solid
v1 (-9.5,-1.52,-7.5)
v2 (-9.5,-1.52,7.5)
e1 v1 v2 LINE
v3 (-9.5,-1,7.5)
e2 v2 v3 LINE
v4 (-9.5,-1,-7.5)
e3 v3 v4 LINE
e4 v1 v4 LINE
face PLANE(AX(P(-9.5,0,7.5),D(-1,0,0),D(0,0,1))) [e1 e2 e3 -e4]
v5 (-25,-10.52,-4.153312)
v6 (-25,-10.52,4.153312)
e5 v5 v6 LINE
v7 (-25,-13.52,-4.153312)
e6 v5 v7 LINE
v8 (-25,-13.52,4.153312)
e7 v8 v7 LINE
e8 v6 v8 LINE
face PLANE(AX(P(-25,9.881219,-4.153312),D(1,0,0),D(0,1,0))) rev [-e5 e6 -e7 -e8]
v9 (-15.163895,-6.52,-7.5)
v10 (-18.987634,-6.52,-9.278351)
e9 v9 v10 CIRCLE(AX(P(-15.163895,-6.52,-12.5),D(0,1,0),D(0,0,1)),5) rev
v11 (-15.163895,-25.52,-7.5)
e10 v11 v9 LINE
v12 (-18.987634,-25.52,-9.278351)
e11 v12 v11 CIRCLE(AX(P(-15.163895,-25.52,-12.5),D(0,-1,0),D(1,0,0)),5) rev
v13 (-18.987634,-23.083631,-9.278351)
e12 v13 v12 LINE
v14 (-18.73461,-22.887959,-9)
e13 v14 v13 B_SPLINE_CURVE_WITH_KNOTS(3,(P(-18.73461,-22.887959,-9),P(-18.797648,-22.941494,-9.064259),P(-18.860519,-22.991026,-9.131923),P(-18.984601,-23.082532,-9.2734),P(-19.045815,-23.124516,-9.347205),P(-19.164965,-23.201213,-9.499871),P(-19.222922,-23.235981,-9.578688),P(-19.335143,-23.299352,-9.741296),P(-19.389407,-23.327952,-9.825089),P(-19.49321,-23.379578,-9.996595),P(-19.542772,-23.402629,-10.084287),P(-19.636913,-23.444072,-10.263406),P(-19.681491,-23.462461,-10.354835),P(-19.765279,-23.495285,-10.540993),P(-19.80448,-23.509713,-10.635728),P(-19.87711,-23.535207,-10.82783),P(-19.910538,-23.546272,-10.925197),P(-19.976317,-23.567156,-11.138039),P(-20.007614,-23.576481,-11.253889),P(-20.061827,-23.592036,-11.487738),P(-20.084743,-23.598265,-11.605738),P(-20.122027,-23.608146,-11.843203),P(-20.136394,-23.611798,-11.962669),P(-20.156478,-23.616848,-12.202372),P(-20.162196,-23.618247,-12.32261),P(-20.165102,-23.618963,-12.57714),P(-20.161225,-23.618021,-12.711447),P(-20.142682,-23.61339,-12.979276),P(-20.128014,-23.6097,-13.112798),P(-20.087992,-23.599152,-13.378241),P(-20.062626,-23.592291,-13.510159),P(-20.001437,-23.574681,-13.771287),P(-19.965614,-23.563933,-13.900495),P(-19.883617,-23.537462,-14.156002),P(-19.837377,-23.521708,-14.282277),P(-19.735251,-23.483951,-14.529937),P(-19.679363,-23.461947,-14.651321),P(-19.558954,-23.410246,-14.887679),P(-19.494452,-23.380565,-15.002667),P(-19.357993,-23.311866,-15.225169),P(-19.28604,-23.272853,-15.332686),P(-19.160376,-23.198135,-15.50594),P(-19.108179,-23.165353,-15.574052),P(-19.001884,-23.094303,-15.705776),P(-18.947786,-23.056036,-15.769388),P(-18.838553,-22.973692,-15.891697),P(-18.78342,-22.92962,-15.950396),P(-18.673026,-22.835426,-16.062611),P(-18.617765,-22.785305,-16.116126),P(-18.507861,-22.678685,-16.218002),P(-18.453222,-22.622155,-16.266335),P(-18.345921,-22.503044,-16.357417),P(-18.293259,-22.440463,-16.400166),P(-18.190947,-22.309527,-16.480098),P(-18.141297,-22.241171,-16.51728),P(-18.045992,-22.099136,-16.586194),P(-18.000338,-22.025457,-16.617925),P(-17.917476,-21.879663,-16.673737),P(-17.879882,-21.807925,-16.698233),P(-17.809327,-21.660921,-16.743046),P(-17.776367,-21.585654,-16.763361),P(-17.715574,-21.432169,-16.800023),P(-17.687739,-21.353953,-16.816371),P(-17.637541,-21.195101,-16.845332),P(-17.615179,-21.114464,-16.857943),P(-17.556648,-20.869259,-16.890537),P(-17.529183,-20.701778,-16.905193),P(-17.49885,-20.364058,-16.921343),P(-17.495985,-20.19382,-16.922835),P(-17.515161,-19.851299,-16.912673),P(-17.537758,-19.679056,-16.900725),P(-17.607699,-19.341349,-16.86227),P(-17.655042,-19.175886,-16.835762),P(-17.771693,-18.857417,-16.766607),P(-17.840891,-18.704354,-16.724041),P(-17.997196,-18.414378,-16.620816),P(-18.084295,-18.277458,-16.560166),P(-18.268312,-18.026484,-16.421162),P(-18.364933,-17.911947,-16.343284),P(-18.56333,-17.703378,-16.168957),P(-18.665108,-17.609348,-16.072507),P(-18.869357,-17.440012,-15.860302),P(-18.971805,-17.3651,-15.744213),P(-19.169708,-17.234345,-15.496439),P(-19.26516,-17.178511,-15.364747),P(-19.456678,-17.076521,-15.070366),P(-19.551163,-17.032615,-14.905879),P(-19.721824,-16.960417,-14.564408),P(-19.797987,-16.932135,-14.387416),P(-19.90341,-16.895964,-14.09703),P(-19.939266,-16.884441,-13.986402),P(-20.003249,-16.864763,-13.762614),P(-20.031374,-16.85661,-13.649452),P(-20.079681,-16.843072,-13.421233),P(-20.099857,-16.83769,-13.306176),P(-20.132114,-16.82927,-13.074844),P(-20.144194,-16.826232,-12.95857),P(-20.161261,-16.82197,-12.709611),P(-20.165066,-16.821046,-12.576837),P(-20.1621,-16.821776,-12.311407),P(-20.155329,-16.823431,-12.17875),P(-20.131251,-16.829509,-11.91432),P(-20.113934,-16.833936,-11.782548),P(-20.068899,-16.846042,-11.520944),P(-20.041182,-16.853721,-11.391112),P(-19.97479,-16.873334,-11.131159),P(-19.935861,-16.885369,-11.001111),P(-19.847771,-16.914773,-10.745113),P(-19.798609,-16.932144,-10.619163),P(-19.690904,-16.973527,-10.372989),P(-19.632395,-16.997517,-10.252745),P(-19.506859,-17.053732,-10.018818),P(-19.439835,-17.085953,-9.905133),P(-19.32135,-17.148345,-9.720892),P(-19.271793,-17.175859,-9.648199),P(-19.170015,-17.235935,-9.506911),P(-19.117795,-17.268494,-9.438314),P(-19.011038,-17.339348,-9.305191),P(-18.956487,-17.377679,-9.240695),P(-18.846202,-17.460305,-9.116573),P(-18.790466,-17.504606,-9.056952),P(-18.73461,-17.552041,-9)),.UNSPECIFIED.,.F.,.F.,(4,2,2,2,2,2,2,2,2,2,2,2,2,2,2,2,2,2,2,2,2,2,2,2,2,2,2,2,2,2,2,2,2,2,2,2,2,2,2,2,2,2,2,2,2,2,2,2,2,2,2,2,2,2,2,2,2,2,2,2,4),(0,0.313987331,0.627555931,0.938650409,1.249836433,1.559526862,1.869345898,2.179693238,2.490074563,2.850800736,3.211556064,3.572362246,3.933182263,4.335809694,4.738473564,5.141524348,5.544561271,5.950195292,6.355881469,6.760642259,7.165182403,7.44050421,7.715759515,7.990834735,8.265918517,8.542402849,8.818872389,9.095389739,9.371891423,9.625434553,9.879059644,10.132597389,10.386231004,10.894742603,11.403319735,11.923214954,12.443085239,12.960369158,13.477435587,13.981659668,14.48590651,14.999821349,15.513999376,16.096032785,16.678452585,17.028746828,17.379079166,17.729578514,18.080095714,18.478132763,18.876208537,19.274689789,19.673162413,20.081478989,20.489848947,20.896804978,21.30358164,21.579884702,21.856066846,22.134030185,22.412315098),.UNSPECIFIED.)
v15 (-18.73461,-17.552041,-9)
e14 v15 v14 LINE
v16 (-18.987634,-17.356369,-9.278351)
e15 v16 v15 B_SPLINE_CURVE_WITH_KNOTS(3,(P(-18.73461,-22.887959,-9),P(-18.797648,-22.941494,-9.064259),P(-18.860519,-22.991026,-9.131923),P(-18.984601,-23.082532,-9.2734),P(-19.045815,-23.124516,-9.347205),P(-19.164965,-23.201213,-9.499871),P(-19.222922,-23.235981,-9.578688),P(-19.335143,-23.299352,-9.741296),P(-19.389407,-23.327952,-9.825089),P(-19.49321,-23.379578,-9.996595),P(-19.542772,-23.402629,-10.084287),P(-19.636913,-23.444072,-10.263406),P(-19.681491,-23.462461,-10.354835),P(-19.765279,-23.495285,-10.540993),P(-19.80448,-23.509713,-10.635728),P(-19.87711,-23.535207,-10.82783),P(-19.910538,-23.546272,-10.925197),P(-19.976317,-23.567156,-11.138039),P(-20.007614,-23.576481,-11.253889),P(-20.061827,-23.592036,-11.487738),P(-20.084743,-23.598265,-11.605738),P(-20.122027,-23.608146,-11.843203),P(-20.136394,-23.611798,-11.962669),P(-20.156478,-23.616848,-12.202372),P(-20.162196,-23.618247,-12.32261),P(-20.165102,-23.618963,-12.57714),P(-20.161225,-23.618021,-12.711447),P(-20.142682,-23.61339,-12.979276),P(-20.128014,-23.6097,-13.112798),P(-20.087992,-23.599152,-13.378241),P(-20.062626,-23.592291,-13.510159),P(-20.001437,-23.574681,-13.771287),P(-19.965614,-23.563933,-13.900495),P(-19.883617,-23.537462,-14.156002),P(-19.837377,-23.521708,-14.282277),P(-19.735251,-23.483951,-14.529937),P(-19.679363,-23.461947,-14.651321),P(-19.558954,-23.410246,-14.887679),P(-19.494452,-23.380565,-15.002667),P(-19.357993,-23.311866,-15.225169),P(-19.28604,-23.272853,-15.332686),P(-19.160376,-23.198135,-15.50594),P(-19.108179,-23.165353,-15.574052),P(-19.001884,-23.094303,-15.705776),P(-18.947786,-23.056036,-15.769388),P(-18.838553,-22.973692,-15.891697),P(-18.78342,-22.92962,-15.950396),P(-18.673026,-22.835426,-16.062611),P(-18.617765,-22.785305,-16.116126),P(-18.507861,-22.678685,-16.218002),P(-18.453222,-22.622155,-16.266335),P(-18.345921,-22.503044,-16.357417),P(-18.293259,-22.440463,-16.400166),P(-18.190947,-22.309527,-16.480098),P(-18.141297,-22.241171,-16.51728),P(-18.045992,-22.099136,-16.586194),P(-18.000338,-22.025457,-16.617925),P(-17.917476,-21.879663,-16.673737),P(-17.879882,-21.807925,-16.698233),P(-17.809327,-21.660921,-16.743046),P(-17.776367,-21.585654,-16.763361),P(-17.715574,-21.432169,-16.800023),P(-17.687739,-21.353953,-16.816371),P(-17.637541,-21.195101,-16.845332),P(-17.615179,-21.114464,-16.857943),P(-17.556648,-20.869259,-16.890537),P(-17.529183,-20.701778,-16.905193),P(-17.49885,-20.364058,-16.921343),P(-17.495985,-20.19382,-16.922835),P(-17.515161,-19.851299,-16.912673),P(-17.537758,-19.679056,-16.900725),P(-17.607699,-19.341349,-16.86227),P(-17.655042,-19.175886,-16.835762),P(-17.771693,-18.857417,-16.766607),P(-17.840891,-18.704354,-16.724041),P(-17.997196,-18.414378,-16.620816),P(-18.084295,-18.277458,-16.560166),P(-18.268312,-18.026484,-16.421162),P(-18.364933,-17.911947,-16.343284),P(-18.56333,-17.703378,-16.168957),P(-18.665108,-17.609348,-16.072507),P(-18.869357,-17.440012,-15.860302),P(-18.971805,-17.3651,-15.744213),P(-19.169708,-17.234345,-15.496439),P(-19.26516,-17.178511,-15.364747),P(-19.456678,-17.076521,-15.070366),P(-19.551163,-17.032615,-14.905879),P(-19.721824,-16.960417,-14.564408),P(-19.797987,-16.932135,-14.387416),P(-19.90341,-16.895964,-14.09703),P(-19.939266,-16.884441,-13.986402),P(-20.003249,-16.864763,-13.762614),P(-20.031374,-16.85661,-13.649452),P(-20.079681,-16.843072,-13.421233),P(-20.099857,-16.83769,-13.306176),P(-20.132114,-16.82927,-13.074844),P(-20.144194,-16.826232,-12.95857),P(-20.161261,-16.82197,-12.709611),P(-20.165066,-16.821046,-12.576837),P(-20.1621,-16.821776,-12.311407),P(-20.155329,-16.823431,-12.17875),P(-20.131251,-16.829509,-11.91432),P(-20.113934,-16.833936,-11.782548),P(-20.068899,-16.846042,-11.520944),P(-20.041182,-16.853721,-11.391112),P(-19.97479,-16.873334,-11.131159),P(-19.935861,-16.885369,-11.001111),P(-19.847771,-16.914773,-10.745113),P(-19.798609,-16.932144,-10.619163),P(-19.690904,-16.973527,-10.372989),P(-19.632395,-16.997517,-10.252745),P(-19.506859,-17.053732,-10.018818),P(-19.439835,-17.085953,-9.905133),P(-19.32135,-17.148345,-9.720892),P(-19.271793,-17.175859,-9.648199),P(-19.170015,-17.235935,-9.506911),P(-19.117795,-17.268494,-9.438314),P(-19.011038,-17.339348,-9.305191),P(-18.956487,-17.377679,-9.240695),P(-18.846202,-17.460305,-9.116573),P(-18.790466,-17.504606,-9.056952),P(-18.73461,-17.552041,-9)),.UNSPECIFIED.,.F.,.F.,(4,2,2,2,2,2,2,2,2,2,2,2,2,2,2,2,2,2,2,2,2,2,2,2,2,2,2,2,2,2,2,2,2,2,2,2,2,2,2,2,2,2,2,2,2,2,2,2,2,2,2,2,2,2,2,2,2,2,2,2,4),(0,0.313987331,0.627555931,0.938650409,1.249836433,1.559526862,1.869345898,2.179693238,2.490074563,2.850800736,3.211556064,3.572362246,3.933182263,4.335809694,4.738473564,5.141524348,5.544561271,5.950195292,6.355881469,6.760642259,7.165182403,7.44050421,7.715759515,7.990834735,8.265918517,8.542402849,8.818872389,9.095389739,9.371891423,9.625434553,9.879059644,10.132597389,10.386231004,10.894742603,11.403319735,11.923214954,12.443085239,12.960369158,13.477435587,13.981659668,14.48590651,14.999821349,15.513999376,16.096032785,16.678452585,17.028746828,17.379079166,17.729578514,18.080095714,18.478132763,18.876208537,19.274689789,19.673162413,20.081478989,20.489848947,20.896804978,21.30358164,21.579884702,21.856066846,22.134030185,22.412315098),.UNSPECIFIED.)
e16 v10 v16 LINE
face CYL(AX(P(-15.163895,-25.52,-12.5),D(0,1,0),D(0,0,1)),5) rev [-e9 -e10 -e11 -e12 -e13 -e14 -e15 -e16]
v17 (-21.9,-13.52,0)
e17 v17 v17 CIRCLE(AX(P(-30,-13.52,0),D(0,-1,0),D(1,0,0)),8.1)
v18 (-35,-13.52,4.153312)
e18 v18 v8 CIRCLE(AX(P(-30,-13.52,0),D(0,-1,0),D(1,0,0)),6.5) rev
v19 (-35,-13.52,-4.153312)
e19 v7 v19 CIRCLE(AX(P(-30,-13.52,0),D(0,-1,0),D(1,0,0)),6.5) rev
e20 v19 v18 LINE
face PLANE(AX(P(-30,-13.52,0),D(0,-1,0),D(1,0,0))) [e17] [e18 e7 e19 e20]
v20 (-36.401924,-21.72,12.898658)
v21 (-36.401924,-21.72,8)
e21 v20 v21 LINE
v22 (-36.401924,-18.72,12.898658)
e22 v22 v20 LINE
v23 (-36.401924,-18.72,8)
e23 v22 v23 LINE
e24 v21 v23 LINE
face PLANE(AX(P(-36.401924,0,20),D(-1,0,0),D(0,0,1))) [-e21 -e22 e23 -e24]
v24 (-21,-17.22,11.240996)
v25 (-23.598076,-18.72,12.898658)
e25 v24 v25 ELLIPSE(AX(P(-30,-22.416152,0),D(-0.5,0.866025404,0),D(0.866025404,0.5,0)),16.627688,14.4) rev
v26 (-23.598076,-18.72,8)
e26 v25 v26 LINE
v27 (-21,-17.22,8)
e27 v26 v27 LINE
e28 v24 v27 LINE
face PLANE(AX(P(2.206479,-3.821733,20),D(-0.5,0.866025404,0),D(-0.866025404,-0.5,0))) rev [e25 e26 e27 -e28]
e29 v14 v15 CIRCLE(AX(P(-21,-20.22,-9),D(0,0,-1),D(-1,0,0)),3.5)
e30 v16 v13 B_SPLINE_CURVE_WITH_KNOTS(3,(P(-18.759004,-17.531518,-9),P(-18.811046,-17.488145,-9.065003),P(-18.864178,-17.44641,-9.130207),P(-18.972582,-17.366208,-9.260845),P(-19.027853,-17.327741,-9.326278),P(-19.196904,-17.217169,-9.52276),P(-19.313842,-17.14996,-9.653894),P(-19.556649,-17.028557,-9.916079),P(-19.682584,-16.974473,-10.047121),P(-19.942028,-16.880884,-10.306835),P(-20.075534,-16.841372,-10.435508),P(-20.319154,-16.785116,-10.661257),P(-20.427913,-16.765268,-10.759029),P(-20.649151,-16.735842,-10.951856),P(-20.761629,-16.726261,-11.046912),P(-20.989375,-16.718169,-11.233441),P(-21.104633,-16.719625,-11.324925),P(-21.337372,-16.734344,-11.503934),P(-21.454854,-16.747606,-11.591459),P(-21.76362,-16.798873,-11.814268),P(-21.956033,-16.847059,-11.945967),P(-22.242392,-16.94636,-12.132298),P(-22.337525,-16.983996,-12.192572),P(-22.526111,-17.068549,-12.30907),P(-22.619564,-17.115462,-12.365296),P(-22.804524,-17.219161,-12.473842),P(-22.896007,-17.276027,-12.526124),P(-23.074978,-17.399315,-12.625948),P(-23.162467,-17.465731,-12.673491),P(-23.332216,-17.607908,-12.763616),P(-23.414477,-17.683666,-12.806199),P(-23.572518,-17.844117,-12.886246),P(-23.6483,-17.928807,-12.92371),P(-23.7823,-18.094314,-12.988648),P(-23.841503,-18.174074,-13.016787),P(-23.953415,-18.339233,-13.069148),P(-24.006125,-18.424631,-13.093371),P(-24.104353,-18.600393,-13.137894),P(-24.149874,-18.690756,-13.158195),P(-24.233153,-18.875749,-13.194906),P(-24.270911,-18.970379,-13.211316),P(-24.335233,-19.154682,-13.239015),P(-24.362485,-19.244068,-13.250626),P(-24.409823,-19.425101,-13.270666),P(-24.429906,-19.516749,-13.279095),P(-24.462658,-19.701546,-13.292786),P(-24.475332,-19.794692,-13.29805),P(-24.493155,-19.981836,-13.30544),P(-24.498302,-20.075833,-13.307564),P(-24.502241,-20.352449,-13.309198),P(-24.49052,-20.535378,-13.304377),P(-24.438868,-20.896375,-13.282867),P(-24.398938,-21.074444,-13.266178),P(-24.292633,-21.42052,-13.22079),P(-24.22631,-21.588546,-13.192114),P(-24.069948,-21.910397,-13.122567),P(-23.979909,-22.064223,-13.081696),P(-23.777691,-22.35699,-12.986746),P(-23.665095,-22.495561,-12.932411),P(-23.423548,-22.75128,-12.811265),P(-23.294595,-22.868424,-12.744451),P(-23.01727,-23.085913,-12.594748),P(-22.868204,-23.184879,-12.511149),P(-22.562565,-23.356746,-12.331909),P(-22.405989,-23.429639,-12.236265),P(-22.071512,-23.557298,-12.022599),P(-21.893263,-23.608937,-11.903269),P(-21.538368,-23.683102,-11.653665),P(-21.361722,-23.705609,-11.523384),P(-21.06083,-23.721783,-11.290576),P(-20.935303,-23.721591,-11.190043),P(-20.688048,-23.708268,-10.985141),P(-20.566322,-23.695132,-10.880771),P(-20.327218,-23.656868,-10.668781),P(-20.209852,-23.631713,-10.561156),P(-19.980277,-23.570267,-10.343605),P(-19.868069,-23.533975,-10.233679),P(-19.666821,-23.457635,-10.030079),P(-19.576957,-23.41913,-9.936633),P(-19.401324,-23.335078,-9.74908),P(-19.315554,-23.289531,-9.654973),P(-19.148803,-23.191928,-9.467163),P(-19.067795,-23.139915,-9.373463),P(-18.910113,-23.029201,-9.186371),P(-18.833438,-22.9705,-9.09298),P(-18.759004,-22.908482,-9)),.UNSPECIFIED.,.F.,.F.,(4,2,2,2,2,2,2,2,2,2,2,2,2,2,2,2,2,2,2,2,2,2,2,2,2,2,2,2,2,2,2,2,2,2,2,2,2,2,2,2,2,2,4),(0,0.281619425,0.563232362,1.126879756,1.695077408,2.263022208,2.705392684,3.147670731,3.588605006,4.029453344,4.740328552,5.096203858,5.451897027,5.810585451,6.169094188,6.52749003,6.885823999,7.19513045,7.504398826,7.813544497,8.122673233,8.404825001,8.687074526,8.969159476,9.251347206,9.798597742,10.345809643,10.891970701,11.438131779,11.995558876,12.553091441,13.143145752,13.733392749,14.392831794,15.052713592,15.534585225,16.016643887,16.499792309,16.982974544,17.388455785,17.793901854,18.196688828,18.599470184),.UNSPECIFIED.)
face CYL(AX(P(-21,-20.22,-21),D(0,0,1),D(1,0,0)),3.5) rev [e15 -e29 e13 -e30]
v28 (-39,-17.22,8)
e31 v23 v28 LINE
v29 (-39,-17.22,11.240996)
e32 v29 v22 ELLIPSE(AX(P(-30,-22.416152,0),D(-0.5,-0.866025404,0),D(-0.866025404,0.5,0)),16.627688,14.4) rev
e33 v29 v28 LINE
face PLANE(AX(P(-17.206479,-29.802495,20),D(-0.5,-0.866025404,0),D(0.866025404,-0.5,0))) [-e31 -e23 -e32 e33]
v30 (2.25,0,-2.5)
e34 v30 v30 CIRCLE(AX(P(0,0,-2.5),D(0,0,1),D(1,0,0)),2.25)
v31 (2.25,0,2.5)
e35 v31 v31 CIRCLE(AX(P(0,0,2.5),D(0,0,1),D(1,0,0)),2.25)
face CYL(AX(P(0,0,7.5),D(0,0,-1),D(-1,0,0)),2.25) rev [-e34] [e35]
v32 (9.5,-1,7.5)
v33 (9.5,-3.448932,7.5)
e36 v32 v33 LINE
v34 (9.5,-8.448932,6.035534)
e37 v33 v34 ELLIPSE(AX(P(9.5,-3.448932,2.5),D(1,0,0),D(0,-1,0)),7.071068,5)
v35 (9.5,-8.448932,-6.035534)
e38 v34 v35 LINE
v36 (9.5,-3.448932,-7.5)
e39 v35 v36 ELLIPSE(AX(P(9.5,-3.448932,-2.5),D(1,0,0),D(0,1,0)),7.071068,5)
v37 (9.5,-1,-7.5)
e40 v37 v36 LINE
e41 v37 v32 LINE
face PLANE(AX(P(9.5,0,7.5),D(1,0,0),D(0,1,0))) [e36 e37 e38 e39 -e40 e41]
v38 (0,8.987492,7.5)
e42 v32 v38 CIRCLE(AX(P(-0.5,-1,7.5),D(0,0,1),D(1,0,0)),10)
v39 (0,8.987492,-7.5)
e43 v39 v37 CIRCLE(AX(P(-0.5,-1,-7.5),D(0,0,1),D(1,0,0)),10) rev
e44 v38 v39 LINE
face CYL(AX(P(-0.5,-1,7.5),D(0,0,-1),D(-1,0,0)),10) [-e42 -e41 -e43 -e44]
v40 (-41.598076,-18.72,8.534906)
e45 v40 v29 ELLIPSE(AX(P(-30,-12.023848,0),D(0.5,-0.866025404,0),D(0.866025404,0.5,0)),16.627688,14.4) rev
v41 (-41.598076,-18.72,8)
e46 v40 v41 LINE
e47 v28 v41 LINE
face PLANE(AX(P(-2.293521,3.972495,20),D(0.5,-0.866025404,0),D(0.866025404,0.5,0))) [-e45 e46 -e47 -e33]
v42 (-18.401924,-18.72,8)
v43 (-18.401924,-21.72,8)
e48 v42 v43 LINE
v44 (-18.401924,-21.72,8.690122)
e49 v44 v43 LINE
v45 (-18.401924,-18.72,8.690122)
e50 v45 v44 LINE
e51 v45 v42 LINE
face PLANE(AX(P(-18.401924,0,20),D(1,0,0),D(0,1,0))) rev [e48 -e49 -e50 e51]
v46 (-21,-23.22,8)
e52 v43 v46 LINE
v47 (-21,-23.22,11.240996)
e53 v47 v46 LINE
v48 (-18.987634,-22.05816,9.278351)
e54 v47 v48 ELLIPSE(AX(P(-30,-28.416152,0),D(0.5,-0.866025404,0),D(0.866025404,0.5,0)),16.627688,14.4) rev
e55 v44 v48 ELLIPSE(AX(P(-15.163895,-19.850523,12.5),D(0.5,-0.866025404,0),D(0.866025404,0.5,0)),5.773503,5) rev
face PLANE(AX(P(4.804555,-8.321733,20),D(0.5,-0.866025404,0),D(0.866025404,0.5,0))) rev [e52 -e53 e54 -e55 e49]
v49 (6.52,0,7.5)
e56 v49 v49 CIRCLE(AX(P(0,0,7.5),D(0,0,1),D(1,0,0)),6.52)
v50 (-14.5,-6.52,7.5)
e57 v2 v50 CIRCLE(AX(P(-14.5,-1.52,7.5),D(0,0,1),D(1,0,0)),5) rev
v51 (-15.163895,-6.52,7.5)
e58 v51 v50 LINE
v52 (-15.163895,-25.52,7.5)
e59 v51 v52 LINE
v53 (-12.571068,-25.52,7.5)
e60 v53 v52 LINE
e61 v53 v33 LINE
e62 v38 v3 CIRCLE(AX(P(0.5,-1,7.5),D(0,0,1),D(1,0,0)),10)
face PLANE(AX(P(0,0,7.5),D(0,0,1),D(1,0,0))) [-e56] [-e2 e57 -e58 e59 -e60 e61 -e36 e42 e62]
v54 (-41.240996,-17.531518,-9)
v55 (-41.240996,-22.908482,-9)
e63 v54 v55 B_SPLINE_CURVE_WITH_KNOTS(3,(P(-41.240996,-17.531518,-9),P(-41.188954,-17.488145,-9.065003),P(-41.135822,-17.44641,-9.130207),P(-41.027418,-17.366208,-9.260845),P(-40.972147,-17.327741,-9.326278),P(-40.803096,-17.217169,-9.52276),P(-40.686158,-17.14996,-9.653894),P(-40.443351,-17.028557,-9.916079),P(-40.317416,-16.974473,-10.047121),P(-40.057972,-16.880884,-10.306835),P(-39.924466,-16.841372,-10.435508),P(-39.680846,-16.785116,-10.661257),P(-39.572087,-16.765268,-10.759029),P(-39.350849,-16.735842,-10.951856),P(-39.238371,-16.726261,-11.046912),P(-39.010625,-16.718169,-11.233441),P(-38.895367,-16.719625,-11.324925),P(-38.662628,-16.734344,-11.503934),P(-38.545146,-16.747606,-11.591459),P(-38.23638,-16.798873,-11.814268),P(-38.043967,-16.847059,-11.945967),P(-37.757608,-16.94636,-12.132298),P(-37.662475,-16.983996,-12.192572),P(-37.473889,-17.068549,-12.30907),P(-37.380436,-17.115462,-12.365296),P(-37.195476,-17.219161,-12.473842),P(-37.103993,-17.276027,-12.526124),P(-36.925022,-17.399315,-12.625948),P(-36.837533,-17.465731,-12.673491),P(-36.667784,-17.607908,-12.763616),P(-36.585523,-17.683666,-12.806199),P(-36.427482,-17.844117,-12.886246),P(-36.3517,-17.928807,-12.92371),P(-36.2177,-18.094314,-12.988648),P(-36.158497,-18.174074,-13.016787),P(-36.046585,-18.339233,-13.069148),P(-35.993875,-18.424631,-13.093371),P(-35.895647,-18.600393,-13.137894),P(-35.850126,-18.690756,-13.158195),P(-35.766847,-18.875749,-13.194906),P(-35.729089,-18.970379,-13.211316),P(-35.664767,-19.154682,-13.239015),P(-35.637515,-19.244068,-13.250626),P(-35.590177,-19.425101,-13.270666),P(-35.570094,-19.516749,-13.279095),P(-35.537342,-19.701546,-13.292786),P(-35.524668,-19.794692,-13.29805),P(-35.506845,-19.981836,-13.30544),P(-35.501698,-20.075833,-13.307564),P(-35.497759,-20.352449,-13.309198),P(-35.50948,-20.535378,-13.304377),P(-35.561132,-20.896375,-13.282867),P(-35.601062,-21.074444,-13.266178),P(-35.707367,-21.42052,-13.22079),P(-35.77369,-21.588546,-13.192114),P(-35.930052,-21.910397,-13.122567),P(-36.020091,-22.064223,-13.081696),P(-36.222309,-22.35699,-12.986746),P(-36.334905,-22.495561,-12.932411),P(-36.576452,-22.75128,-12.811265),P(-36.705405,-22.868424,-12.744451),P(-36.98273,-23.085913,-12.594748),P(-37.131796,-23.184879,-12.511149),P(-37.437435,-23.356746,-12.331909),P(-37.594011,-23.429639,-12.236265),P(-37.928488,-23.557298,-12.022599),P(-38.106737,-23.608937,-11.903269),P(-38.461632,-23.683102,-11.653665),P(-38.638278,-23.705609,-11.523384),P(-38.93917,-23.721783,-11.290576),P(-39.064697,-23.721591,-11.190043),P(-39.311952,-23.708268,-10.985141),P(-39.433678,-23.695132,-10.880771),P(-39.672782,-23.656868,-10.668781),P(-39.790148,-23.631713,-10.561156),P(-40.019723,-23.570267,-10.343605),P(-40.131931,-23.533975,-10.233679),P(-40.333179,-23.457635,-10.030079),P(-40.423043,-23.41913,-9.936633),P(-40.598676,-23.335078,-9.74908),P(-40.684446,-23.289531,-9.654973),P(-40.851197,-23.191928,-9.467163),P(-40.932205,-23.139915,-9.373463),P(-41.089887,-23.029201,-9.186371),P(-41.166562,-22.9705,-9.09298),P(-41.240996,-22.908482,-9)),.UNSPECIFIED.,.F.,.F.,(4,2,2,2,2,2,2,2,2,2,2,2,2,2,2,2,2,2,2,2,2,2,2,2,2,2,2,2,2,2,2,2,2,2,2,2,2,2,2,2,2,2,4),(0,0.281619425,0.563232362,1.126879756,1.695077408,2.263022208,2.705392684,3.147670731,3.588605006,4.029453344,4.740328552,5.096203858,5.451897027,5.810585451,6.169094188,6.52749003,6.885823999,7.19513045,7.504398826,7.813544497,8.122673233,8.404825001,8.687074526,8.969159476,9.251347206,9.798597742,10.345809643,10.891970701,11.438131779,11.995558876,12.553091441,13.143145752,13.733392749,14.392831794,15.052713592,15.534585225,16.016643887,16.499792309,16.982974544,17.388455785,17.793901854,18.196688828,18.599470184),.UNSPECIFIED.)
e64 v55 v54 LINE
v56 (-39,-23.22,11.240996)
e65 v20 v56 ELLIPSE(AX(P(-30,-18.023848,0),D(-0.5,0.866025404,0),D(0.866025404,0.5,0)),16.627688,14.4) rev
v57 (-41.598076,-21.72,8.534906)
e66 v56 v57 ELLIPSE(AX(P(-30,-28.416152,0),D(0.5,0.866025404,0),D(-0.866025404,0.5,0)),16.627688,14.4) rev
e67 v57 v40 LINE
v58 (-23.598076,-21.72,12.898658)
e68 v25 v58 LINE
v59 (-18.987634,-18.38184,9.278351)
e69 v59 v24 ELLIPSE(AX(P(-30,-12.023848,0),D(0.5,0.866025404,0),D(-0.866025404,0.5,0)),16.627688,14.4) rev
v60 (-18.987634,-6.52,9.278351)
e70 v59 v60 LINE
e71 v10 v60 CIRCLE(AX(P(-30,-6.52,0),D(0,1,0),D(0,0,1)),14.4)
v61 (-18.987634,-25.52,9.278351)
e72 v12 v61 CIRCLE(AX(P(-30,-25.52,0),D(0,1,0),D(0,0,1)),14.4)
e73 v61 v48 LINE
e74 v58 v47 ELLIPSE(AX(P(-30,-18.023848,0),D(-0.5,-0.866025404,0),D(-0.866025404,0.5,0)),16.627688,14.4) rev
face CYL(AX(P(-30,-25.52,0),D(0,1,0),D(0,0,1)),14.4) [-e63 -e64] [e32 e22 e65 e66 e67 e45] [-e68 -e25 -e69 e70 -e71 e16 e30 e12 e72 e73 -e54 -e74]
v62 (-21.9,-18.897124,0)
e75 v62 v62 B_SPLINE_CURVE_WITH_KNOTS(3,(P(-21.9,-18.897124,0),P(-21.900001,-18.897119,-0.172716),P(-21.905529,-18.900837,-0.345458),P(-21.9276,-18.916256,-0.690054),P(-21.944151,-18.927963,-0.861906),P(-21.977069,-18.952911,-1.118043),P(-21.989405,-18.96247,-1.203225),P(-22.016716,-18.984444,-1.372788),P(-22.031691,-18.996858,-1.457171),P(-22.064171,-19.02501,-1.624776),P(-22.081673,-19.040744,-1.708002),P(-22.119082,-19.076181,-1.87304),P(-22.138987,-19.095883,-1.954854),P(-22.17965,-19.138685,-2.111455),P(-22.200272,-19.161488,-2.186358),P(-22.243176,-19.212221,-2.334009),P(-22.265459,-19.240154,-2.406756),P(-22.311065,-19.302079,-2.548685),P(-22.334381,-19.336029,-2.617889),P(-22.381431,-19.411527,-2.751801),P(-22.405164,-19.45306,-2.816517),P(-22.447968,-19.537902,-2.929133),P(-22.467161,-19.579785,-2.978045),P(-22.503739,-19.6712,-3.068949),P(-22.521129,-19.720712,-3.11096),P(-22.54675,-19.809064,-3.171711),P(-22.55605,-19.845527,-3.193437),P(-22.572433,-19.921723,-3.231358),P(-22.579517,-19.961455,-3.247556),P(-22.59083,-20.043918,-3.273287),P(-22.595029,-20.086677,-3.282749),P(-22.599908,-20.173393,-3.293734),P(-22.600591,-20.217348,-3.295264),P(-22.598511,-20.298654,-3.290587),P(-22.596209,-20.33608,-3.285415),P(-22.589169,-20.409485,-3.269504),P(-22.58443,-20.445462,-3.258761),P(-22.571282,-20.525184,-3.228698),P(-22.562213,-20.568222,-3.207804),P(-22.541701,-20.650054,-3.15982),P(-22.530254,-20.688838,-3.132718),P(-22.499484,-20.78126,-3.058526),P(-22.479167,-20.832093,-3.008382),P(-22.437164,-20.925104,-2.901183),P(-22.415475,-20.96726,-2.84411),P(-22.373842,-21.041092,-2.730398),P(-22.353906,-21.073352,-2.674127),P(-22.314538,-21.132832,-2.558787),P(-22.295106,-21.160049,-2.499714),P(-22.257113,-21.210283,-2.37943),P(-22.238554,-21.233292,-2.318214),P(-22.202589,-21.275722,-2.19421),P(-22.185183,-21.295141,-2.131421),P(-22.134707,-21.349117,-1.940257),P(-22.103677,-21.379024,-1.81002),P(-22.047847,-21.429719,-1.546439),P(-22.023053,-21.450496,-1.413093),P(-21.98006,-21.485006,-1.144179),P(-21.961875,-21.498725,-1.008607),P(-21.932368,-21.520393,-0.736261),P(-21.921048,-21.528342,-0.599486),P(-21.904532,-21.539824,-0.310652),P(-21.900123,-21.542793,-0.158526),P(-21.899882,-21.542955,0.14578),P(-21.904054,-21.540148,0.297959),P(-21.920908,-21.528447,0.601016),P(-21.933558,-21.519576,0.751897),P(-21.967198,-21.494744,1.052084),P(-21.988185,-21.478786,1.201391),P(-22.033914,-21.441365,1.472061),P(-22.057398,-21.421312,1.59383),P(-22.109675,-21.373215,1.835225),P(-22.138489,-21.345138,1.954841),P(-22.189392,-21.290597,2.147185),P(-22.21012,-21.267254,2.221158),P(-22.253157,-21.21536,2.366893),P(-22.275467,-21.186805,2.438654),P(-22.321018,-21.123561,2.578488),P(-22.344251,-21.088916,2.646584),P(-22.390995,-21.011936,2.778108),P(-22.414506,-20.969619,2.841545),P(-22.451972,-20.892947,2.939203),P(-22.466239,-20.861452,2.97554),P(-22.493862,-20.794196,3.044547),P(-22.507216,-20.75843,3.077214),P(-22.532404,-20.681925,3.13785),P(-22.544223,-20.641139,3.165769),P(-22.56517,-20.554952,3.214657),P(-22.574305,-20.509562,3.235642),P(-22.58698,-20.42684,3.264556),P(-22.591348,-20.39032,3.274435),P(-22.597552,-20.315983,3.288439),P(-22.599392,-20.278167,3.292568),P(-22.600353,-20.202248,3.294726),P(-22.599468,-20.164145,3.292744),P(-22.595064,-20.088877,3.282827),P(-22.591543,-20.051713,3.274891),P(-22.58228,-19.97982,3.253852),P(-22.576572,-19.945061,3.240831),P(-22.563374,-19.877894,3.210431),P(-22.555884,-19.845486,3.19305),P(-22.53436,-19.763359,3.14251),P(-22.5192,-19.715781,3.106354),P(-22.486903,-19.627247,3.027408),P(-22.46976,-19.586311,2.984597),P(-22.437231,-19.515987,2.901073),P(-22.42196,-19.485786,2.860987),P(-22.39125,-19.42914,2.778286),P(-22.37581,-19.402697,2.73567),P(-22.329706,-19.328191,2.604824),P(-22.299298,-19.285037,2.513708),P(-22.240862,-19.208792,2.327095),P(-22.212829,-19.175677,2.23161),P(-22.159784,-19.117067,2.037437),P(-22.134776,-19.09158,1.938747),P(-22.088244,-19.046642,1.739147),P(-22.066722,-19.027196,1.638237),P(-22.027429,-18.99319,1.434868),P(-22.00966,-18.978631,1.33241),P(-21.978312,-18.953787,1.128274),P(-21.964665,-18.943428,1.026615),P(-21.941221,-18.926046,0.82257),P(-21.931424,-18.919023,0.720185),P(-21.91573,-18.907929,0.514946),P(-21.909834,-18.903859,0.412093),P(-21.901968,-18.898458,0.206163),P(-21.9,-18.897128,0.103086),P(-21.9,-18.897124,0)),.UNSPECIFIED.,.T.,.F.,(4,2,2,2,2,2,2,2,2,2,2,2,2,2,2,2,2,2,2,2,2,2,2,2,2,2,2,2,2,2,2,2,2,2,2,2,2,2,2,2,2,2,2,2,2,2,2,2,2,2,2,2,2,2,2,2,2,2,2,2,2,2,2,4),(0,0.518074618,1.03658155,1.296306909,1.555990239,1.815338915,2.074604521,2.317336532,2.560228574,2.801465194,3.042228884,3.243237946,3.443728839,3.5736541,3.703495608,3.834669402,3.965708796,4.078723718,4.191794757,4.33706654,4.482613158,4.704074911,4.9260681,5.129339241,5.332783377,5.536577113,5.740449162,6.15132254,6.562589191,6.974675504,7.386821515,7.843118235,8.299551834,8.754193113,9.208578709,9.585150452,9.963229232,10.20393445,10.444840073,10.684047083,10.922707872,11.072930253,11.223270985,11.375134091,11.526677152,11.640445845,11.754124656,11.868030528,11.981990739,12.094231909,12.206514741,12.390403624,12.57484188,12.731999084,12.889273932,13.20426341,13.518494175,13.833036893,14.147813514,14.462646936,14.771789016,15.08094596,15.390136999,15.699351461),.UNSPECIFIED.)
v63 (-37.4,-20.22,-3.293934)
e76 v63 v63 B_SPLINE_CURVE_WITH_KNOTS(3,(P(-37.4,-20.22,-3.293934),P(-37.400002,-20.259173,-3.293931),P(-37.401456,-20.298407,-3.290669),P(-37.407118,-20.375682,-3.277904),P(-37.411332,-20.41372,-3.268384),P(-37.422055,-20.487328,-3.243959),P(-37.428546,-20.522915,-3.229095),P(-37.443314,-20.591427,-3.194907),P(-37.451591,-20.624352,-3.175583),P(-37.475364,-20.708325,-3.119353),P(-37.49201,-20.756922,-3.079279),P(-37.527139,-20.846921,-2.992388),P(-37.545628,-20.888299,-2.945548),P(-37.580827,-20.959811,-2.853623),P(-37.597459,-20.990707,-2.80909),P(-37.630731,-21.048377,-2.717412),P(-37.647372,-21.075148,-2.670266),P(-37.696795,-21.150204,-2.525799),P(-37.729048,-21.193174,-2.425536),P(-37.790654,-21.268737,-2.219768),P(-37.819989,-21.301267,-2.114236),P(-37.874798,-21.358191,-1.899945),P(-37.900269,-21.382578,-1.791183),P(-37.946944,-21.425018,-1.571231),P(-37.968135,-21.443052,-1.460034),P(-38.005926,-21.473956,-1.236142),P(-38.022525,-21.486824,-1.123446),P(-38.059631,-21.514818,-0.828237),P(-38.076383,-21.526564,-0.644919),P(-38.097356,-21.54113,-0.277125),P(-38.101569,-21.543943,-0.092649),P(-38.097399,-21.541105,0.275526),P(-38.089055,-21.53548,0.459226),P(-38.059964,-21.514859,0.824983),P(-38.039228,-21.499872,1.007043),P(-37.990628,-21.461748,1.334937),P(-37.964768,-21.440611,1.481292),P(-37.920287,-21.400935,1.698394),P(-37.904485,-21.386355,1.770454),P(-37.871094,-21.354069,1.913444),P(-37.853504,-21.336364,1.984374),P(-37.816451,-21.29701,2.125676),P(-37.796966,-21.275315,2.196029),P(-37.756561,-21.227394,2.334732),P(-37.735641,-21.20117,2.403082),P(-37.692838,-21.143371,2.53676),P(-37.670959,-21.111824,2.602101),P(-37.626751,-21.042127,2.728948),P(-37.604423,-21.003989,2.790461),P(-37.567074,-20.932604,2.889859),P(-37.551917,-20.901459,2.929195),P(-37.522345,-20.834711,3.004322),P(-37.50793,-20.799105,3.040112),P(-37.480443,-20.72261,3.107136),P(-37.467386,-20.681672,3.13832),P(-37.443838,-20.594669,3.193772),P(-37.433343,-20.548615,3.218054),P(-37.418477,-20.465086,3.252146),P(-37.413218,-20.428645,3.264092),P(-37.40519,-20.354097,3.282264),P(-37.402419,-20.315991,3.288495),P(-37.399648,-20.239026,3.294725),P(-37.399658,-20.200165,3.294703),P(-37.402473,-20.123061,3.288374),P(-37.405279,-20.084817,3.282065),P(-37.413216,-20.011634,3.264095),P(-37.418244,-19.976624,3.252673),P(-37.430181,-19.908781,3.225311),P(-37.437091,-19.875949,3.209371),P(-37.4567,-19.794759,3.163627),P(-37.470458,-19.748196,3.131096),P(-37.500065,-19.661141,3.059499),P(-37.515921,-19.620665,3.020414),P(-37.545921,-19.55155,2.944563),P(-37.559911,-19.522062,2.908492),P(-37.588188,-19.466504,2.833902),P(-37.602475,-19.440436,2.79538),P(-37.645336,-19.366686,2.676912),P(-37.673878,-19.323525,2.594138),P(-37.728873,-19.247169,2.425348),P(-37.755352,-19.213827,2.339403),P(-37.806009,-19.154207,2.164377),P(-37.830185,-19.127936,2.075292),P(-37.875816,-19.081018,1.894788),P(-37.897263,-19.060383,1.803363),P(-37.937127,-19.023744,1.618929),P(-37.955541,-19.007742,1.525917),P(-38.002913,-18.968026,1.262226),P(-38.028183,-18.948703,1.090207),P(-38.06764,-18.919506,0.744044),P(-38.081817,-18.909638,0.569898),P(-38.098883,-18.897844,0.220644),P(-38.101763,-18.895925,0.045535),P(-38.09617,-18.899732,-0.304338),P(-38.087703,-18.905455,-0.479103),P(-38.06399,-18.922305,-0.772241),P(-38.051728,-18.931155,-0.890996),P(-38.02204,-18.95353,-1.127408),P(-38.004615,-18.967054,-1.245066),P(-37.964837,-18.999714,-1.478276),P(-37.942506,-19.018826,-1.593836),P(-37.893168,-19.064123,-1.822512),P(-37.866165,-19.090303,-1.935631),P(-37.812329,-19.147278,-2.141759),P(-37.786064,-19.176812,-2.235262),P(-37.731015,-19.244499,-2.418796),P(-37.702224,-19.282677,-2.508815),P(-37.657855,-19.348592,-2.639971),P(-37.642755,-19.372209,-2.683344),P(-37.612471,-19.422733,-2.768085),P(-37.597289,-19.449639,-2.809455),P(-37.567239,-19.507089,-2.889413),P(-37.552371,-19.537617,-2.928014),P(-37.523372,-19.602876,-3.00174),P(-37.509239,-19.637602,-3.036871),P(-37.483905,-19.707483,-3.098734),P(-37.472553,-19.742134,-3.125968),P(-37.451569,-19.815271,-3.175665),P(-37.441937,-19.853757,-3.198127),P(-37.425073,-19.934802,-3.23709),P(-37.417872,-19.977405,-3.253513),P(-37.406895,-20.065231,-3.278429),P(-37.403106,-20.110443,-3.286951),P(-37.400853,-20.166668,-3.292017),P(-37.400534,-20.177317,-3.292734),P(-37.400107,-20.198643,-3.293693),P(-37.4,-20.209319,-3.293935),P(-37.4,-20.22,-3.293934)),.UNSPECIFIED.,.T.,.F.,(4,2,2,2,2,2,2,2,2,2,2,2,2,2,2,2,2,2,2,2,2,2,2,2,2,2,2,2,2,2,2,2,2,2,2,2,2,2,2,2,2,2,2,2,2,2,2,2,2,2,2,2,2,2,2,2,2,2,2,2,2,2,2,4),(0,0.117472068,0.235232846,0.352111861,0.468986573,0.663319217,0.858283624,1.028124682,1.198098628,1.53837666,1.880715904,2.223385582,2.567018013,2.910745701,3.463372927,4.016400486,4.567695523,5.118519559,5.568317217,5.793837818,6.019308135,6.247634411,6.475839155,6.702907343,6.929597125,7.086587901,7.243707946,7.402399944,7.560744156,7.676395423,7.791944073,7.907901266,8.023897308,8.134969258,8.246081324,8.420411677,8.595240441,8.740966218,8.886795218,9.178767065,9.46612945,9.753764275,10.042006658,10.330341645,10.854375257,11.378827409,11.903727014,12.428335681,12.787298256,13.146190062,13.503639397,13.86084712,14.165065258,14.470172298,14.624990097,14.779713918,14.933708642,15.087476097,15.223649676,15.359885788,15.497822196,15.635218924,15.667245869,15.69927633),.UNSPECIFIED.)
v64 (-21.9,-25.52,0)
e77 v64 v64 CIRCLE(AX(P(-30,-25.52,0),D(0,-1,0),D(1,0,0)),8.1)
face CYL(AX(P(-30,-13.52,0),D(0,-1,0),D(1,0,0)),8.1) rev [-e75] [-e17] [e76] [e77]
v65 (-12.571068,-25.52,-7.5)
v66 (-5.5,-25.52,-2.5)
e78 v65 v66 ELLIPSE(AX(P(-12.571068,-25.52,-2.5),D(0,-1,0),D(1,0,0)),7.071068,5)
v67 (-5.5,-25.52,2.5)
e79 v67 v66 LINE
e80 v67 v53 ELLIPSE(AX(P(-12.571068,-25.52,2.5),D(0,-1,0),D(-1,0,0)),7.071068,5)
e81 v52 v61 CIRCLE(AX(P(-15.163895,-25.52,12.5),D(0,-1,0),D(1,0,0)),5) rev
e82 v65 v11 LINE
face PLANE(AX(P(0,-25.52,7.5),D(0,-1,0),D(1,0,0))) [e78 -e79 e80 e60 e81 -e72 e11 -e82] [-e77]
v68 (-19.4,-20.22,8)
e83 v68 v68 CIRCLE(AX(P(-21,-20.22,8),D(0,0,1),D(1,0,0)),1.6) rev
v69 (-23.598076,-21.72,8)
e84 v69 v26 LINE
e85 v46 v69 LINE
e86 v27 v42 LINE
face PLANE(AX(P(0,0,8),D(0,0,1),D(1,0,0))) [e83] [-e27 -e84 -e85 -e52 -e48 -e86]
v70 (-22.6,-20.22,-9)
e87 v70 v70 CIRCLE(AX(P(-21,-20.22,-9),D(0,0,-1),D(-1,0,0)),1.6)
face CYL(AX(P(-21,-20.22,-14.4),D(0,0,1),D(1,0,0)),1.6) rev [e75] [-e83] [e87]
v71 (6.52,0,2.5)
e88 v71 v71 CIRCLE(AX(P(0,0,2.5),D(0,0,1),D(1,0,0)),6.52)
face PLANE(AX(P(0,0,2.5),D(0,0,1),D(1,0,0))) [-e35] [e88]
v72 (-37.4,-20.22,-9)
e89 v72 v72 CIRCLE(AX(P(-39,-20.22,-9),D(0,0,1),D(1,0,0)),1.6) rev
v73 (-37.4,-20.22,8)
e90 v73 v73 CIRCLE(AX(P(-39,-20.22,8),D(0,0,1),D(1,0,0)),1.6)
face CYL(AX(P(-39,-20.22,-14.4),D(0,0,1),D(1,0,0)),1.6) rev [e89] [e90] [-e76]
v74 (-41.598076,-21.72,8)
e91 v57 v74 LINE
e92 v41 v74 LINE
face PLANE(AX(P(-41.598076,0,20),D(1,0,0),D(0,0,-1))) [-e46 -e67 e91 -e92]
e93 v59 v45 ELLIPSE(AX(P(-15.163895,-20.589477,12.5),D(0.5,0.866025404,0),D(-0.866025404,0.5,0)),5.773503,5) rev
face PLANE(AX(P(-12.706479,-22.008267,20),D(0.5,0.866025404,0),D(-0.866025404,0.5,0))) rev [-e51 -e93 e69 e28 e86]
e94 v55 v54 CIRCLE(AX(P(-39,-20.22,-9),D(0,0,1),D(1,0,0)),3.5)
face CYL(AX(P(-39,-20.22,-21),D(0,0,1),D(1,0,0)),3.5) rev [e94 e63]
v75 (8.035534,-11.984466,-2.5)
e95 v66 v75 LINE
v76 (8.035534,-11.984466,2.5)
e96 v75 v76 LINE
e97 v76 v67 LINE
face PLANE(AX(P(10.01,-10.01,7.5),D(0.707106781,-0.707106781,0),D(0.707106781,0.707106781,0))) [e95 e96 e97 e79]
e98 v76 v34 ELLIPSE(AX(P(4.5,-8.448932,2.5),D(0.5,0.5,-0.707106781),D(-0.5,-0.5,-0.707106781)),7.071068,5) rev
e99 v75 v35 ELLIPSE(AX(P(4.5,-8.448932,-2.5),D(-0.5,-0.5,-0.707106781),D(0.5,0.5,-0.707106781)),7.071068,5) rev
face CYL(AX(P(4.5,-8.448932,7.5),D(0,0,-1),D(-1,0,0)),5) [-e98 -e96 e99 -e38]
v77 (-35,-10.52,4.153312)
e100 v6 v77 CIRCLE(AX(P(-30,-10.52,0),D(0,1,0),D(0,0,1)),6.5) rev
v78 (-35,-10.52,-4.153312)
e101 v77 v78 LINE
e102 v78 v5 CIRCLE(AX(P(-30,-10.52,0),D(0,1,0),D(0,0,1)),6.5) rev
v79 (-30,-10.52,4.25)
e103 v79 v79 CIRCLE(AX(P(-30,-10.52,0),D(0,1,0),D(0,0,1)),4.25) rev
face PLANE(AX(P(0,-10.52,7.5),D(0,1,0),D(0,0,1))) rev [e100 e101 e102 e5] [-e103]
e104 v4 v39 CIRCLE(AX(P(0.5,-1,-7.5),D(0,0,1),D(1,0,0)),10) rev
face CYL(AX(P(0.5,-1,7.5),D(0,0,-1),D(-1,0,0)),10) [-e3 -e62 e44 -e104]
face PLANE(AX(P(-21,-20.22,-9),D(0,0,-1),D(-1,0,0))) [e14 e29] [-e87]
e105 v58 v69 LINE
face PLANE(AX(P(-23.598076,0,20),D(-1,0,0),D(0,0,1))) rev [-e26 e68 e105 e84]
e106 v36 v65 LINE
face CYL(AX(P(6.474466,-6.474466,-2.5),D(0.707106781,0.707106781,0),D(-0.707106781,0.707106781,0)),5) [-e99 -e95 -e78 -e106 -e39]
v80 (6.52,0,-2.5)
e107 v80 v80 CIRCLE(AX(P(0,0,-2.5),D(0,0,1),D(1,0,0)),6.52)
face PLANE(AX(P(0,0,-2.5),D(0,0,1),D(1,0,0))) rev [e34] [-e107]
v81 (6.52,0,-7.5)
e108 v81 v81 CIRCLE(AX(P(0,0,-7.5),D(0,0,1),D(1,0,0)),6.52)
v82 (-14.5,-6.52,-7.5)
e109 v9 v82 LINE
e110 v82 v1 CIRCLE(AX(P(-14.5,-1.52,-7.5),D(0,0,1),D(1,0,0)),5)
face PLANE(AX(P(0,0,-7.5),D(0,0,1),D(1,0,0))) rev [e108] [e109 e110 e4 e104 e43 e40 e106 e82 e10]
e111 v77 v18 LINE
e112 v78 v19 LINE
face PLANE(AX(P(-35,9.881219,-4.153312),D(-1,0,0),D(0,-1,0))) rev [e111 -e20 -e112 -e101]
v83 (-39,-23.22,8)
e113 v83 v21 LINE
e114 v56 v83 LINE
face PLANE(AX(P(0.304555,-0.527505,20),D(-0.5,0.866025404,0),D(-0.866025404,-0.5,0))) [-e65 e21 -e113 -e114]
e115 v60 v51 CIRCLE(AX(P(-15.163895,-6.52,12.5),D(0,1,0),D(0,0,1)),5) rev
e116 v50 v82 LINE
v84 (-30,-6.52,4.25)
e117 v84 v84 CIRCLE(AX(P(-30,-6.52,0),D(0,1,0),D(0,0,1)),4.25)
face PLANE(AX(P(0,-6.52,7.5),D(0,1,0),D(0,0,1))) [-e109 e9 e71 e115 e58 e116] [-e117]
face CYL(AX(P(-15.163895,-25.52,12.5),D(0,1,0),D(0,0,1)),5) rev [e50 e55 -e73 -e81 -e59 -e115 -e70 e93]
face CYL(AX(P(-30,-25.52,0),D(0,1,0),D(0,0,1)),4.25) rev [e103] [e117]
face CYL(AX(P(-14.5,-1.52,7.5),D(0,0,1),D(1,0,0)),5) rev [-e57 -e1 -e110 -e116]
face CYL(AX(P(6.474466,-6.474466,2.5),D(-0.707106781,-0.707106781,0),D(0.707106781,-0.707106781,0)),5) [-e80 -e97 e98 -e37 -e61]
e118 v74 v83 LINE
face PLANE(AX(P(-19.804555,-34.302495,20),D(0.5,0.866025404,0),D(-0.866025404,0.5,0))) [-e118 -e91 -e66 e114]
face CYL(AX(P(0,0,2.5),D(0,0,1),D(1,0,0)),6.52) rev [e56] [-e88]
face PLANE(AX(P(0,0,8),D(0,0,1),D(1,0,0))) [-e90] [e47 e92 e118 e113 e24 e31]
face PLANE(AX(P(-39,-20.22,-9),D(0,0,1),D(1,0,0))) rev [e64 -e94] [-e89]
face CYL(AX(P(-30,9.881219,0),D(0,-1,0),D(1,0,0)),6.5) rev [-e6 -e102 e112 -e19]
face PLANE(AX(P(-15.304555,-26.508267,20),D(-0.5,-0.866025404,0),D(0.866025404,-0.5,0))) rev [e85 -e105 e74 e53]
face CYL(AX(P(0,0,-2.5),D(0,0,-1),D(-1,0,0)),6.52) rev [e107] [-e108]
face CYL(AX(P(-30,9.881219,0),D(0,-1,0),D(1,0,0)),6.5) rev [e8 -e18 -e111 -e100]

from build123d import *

# Parameters (mm, degrees)
SKETCH1_R               = 2.25
BOSS_EXTRUDE1_DEPTH     = 7.5
CUT_EXTRUDE1_START      = 7.5
SKETCH1_3_R             = 6.52
CUT_EXTRUDE1_DEPTH      = 5
CUT_EXTRUDE2_START      = -7.5
SKETCH1_4_R             = 6.52
CUT_EXTRUDE2_DEPTH      = 5
SKETCH2_R               = 14.4
BOSS_EXTRUDE2_DEPTH     = 19
CUT_EXTRUDE3_DEPTH      = 51.395634732
CUT_EXTRUDE3_DEPTH_BACK = 51.395634732
FILLET1_R               = 5
FILLET2_R               = 10
CUT_EXTRUDE6_DEPTH      = 15
SKETCH5_R               = 8.1
CUT_EXTRUDE7_DEPTH      = 12
CUT_EXTRUDE8_DEPTH      = 54.197654084
CUT_EXTRUDE8_DEPTH_BACK = 54.197654084
SKETCH6_R               = 1.6
CUT_EXTRUDE9_START      = 20
SKETCH6_3_R             = 1.6
CUT_EXTRUDE9_DEPTH      = 12
CUT_EXTRUDE10_START     = -9
SKETCH6_4_R             = 3.5
CUT_EXTRUDE10_DEPTH     = 12
FILLET3_R               = 5


with BuildPart() as part:
    # Sketch1 → Boss-Extrude1 (new, symmetric)
    with BuildSketch(Plane.XY):
        Polygon((-9.5, 9), (9.5, 9), (9.5, -10.52), (-5.5, -25.52), (-30, -25.52), (-30, -6.52), (-9.5, -6.52), align=None)
        Circle(SKETCH1_R, mode=Mode.SUBTRACT)
    extrude(amount=BOSS_EXTRUDE1_DEPTH, both=True)

    # Sketch1<3> → Cut-Extrude1 (cut)
    with BuildSketch(Plane.XY.offset(CUT_EXTRUDE1_START)):
        Circle(SKETCH1_3_R)
    extrude(amount=-CUT_EXTRUDE1_DEPTH, mode=Mode.SUBTRACT)

    # Sketch1<4> → Cut-Extrude2 (cut)
    with BuildSketch(Plane.XY.offset(CUT_EXTRUDE2_START)):
        Circle(SKETCH1_4_R)
    extrude(amount=CUT_EXTRUDE2_DEPTH, mode=Mode.SUBTRACT)

    # Sketch2 → Boss-Extrude2 (add, through all)
    with BuildSketch(Plane(origin=(0, -6.52, 0), x_dir=(1, 0, 0), z_dir=(0, 1, 0))):
        with Locations((-30, 0)):
            Circle(SKETCH2_R)
    extrude(amount=-BOSS_EXTRUDE2_DEPTH)

    # Sketch2<3> → Cut-Extrude3 (cut, two sides: drawn at the far end of the back side and taken through both)
    with BuildSketch(Plane(origin=(0, -6.52, 0), x_dir=(1, 0, 0), z_dir=(0, 1, 0)).offset(-CUT_EXTRUDE3_DEPTH_BACK)):
        with BuildLine():
            ThreePointArc((-30, -4.25), (-26.99479618, -3.00520382), (-25.75, 0))
            ThreePointArc((-25.75, 0), (-26.99479618, 3.00520382), (-30, 4.25))
            Line((-30, 4.25), (-30, -4.25))
        make_face()
        with BuildLine():
            Line((-30, -4.25), (-30, 4.25))
            ThreePointArc((-30, 4.25), (-34.25, 0), (-30, -4.25))
        make_face()
    extrude(amount=CUT_EXTRUDE3_DEPTH + CUT_EXTRUDE3_DEPTH_BACK, mode=Mode.SUBTRACT)

    # Fillet1
    fillet1_edges = [part.edges().sort_by_distance(p)[0] for p in [
        (-9.5, -6.52, 0),
        (-17.707319251, -16.02, -7.5),
        (-17.707319251, -16.02, 7.5),
    ]]
    fillet(fillet1_edges, radius=FILLET1_R)

    # Fillet2
    # the kernel refuses this fillet: 10 mm, written as the material it takes off along each edge
    with BuildSketch(Plane(origin=(-9.5, 9, -32.5), x_dir=(0, -1, 0), z_dir=(0, 0, 1))) as fillet2_piece_1:
        with BuildLine():
            CenterArc((FILLET2_R, FILLET2_R), FILLET2_R, 180, 90)
            Line((0, FILLET2_R), (0, 0))
            Line((0, 0), (FILLET2_R, 0))
        make_face()
    extrude(amount=65, mode=Mode.SUBTRACT)
    with BuildSketch(Plane(origin=(9.5, 9, 32.5), x_dir=(-1, 0, 0), z_dir=(0, 0, -1))) as fillet2_piece_2:
        with BuildLine():
            CenterArc((FILLET2_R, -FILLET2_R), FILLET2_R, 90, 90)
            Line((0, -FILLET2_R), (0, 0))
            Line((0, 0), (FILLET2_R, 0))
        make_face()
    extrude(amount=65, mode=Mode.SUBTRACT)

    # Sketch4 → Cut-Extrude6 (cut)
    with BuildSketch(Plane.XZ.offset(25.52)):
        with BuildLine():
            Line((-25, -4.153311931), (-25, 4.153311931))
            ThreePointArc((-25, 4.153311931), (-30, 6.5), (-35, 4.153311931))
            Line((-35, 4.153311931), (-35, -4.153311931))
            ThreePointArc((-35, -4.153311931), (-30, -6.5), (-25, -4.153311931))
        make_face()
    extrude(amount=-CUT_EXTRUDE6_DEPTH, mode=Mode.SUBTRACT)

    # Sketch5 → Cut-Extrude7 (cut)
    with BuildSketch(Plane.XZ.offset(25.52)):
        with Locations((-30, 0)):
            Circle(SKETCH5_R)
    extrude(amount=-CUT_EXTRUDE7_DEPTH, mode=Mode.SUBTRACT)

    # Sketch6 → Cut-Extrude8 (cut, two sides: drawn at the far end of the back side and taken through both)
    with BuildSketch(Plane.XY.offset(-CUT_EXTRUDE8_DEPTH_BACK)):
        with Locations((-39, -20.22)):
            Circle(SKETCH6_R)
        with Locations((-21, -20.22)):
            Circle(SKETCH6_R)
    extrude(amount=CUT_EXTRUDE8_DEPTH + CUT_EXTRUDE8_DEPTH_BACK, mode=Mode.SUBTRACT)

    # Sketch6<3> → Cut-Extrude9 (cut)
    # profile 1 of 2: a face of its own
    with BuildSketch(Plane.XY.offset(CUT_EXTRUDE9_START)):
        Polygon((-36.401923789, -21.72), (-36.401923789, -18.72), (-39, -17.22), (-41.598076211, -18.72), (-41.598076211, -21.72), (-39, -23.22), align=None)
        with Locations((-39, -20.22)):
            Circle(SKETCH6_3_R, mode=Mode.SUBTRACT)
    # profile 2 of 2: a face of its own
    with BuildSketch(Plane.XY.offset(CUT_EXTRUDE9_START)):
        Polygon((-23.598076211, -18.72), (-21, -17.22), (-18.401923789, -18.72), (-18.401923789, -21.72), (-21, -23.22), (-23.598076211, -21.72), align=None)
        with Locations((-21, -20.22)):
            Circle(SKETCH6_3_R, mode=Mode.SUBTRACT)
    extrude(amount=-CUT_EXTRUDE9_DEPTH, mode=Mode.SUBTRACT)

    # Sketch6<4> → Cut-Extrude10 (cut)
    with BuildSketch(Plane.XY.offset(CUT_EXTRUDE10_START)):
        with Locations((-39, -20.22)):
            Circle(SKETCH6_4_R)
        with Locations((-21, -20.22)):
            Circle(SKETCH6_4_R)
    extrude(amount=-CUT_EXTRUDE10_DEPTH, mode=Mode.SUBTRACT)

    # Fillet3
    fillet3_edges = [part.edges().sort_by_distance(p)[0] for p in [
        (2, -18.02, -7.5),
        (9.5, -10.52, 0),
        (2, -18.02, 7.5),
    ]]
    fillet(fillet3_edges, radius=FILLET3_R)


solid = part.part
